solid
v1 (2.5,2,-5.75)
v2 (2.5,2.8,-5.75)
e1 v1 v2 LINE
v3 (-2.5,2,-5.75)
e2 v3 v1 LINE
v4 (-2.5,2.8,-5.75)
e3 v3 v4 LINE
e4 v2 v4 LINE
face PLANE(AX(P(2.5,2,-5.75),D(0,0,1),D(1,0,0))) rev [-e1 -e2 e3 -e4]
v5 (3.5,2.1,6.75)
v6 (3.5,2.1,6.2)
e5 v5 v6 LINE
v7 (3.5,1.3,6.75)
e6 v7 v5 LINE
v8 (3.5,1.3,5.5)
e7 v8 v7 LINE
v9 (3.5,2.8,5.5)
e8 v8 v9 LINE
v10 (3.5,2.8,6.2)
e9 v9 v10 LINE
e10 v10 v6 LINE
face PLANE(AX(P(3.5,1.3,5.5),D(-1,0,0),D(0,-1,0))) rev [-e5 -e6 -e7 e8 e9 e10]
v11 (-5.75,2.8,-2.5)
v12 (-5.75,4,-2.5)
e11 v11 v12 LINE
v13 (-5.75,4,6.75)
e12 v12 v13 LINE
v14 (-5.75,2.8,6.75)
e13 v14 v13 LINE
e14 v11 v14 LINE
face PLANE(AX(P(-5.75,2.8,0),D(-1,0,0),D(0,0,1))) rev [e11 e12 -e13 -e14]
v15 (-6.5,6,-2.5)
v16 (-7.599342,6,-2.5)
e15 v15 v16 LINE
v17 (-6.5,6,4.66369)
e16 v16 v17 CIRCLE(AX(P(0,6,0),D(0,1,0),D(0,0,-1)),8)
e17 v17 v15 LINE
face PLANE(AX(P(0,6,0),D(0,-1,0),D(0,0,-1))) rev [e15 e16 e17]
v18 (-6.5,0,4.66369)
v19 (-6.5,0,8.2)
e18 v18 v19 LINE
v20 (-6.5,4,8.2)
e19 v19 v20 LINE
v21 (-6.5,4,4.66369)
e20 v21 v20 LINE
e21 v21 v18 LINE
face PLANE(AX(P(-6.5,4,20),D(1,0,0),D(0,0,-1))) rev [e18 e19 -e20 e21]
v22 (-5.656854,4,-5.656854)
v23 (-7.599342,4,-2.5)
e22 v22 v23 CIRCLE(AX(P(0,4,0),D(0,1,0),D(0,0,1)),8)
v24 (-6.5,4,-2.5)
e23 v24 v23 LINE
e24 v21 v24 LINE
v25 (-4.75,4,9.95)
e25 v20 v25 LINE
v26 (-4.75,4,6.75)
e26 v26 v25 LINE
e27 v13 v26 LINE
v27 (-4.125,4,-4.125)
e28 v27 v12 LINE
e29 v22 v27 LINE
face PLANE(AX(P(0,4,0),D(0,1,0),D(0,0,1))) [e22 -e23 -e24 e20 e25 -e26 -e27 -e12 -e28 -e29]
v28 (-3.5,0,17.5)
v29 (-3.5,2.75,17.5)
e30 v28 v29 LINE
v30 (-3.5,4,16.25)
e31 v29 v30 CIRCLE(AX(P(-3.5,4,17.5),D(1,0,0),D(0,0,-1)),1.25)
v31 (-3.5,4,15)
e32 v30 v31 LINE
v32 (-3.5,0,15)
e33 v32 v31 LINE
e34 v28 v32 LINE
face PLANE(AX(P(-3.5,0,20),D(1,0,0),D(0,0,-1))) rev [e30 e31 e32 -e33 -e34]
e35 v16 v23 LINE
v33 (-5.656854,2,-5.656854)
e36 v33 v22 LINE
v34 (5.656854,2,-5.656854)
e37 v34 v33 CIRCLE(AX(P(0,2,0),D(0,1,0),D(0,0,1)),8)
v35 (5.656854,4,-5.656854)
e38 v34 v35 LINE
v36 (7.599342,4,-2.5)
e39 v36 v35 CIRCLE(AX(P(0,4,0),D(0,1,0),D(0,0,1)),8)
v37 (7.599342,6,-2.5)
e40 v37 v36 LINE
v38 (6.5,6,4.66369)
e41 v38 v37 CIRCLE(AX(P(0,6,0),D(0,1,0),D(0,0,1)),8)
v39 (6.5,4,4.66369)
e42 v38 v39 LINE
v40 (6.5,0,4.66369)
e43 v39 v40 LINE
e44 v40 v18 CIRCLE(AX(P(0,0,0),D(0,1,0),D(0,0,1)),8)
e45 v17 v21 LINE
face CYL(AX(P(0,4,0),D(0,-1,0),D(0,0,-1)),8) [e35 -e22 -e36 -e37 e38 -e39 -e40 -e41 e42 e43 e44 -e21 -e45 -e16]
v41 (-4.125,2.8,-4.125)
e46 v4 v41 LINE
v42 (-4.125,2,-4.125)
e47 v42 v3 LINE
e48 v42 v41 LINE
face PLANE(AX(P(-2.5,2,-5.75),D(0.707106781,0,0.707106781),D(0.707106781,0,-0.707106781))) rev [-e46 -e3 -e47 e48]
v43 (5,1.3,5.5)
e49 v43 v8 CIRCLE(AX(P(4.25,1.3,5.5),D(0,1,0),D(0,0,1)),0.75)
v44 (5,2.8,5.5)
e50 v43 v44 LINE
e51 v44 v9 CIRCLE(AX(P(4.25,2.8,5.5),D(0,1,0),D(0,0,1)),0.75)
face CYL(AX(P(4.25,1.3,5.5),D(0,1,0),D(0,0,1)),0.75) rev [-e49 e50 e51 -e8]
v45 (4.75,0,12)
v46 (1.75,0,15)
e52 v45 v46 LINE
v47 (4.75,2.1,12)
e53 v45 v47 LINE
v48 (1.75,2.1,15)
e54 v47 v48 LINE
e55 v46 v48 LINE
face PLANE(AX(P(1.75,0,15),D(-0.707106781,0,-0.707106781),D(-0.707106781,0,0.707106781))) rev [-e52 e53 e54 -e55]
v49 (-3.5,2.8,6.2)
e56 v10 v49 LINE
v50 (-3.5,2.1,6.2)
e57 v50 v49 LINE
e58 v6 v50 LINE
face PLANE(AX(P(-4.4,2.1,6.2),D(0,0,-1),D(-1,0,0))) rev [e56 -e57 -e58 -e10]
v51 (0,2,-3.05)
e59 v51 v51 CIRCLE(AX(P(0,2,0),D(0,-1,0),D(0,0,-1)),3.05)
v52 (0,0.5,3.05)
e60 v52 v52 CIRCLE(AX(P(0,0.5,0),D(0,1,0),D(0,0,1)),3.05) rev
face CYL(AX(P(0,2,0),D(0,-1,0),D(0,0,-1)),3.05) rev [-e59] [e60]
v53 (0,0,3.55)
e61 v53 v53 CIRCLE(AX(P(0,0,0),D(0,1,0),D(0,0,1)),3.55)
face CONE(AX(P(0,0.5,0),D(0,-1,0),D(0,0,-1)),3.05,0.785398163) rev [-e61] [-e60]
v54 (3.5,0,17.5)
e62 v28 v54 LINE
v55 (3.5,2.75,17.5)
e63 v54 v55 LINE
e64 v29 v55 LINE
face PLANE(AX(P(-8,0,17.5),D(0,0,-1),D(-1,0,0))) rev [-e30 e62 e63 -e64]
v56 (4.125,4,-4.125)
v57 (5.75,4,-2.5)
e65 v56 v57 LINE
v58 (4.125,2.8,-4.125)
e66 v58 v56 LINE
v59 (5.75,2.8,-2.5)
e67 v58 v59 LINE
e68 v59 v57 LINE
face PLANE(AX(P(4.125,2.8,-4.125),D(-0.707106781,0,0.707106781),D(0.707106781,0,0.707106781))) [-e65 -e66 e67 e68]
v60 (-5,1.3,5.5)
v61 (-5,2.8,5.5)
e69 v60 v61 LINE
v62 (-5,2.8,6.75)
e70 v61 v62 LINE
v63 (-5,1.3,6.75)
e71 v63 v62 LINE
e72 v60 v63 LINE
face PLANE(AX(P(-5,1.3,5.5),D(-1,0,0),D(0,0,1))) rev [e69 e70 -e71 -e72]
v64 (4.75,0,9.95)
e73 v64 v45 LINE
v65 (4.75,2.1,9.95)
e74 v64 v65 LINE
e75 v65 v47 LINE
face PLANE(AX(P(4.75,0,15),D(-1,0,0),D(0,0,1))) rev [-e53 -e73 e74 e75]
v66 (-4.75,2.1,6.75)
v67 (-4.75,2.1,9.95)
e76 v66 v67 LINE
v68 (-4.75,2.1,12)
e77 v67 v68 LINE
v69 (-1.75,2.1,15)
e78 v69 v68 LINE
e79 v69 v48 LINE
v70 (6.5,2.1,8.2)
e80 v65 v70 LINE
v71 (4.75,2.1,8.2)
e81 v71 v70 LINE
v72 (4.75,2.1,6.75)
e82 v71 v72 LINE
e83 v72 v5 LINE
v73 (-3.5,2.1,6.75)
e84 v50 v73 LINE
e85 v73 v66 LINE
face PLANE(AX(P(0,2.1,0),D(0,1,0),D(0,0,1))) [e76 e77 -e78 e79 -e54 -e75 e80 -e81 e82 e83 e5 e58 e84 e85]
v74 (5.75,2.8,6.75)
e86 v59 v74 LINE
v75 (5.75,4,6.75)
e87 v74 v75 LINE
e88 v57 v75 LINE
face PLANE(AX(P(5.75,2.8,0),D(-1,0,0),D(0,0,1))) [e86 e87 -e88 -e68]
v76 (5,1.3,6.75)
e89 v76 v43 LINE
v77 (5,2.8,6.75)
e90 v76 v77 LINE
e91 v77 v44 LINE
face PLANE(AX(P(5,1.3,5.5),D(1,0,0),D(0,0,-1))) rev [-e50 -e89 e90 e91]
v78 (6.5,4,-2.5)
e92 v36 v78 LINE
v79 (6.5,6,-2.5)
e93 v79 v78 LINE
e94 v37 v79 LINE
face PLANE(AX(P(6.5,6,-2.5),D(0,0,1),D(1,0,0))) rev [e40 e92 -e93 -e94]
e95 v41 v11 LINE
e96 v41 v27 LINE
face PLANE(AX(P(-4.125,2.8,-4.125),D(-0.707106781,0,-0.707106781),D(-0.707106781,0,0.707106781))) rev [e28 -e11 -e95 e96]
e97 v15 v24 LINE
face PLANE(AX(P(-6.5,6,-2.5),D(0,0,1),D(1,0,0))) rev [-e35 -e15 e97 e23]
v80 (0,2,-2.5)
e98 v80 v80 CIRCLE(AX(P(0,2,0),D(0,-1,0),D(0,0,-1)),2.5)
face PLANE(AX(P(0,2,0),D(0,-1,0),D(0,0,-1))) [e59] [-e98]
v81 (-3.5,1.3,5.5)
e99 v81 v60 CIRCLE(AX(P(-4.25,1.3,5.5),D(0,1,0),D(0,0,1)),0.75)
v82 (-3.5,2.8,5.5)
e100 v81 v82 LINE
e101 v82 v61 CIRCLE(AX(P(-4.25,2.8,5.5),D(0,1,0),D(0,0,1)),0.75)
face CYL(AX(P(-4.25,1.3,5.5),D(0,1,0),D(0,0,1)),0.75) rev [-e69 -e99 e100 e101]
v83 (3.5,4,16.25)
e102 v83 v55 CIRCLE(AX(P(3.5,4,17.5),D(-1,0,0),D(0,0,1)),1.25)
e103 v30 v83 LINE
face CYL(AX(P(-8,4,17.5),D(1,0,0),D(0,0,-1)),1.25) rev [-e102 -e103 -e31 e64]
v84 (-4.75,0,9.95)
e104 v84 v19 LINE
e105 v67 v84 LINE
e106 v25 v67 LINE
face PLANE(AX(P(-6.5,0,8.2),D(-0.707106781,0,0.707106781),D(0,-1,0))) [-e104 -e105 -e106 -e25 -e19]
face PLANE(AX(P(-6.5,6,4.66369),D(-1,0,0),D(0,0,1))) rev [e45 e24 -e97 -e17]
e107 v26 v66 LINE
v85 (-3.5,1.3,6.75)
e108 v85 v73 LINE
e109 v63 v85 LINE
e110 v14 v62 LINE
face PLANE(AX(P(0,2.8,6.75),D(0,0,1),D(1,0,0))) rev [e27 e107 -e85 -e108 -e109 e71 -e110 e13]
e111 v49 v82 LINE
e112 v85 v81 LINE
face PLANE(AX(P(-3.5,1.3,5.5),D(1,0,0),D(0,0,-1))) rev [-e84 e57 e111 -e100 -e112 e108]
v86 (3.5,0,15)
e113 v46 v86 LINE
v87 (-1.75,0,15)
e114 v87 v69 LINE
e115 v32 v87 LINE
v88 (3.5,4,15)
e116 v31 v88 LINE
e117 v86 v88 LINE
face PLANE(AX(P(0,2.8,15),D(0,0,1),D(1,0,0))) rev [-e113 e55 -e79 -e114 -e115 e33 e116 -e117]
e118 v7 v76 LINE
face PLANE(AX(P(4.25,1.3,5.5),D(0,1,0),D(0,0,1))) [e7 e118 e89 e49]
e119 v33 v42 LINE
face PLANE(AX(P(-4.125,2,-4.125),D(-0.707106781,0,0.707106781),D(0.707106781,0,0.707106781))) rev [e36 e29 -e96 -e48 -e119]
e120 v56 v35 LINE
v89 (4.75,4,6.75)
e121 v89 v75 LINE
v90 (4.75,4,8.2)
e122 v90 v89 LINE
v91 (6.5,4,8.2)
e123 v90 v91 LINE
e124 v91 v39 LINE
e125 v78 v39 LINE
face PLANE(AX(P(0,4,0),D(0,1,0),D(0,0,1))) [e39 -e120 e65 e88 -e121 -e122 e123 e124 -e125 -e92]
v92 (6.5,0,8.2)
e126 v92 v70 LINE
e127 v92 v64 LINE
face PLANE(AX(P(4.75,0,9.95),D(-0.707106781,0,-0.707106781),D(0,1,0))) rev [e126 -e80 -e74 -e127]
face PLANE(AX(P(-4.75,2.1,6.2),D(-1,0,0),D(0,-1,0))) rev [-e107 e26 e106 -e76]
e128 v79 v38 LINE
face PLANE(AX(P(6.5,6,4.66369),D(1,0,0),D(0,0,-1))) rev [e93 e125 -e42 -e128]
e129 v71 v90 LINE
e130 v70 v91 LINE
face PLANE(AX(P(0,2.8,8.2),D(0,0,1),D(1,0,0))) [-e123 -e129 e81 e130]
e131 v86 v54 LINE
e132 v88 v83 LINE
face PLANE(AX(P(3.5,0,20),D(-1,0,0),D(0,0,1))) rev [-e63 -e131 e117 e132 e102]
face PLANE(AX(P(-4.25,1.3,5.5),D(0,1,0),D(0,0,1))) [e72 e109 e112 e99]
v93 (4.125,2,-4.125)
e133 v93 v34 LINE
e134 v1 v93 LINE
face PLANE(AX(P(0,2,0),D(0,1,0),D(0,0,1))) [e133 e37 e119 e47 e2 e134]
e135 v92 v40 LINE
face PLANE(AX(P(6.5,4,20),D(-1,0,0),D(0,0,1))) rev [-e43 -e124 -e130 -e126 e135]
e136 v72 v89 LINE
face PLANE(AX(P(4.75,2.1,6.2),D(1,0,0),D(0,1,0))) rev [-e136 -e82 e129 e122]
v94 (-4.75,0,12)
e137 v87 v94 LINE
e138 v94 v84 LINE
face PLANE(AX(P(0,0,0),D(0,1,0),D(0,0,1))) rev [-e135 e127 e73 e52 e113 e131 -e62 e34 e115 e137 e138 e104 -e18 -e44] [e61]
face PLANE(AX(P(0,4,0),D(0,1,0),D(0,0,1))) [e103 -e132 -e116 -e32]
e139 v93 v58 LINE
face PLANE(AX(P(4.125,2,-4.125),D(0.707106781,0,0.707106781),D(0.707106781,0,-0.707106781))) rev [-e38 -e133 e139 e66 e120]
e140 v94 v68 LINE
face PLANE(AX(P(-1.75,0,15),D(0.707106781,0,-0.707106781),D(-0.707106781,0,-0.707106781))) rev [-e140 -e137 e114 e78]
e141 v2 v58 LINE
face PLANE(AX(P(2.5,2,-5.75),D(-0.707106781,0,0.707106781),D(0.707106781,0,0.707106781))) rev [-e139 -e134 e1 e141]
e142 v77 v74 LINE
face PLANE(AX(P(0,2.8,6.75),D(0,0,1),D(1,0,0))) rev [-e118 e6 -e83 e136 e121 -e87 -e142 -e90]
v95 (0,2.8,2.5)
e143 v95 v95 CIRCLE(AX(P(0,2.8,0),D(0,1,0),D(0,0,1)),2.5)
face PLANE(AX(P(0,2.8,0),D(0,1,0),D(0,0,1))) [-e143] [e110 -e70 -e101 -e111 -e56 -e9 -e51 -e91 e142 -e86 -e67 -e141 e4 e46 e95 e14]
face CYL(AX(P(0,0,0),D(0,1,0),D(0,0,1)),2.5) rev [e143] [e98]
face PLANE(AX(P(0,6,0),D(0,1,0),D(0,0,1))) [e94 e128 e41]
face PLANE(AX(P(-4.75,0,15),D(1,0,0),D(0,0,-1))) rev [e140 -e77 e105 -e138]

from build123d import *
from build123d.topology import SkipClean

# Parameters (mm, degrees)
BOSS_EXTRUDE1_DEPTH      = 4
SKETCH2_R                = 3.05
CUT_EXTRUDE1_DEPTH       = 2
SKETCH3_R                = 1.5
CUT_EXTRUDE2_DEPTH       = 22.633307653
CUT_EXTRUDE4_START       = -1.2
CUT_EXTRUDE4_DEPTH       = 1.2
CUT_EXTRUDE6_DEPTH       = 1.5
CUT_EXTRUDE7_DEPTH       = 0.7
BOSS_EXTRUDE3_DEPTH      = 2
CUT_EXTRUDE12_START      = -2
CUT_EXTRUDE12_DEPTH      = 2
SKETCH6_R                = 2.5
CUT_EXTRUDE13_DEPTH      = 22.777052142
SKETCH17_W               = 0.35
SKETCH17_H               = 1.45
CUT_EXTRUDE14_DEPTH      = 1.9
BOSS_EXTRUDE5_DEPTH      = 1.9
CUT_EXTRUDE15_DEPTH      = 22.9089023
CUT_EXTRUDE15_DEPTH_BACK = 22.9089023
CUT_EXTRUDE16_DEPTH      = 22.890865675
CUT_EXTRUDE16_DEPTH_BACK = 22.890865675
CUT_EXTRUDE17_DEPTH      = 24.837994882
CUT_EXTRUDE17_DEPTH_BACK = 24.837994882
CHAMFER1_SIZE            = 1.75
CUT_EXTRUDE18_DEPTH      = 24.837994882
BOSS_EXTRUDE6_DEPTH      = 1.9
CHAMFER2_SIZE            = 0.5


with BuildPart() as part:
    # Sketch1 → Boss-Extrude1 (new body)
    with BuildSketch(Plane(origin=(0, 0, 0), x_dir=(1, 0, 0), z_dir=(0, 1, 0))):
        with BuildLine():
            Line((6.5, -20), (6.5, -4.663689527))
            ThreePointArc((6.5, -4.663689527), (7.615773106, -2.449489743), (8, 0))
            ThreePointArc((8, 0), (7.615773106, 2.449489743), (6.5, 4.663689527))
            ThreePointArc((6.5, 4.663689527), (0, 8), (-6.5, 4.663689527))
            ThreePointArc((-6.5, 4.663689527), (-7.615773106, 2.449489743), (-8, 0))
            ThreePointArc((-8, 0), (-7.615773106, -2.449489743), (-6.5, -4.663689527))
            Line((-6.5, -4.663689527), (-6.5, -20))
            Line((-6.5, -20), (6.5, -20))
        make_face()
    extrude(amount=BOSS_EXTRUDE1_DEPTH)

    # Sketch2 → Cut-Extrude1 (cut)
    with BuildSketch(Plane.XZ):
        with Locations(Location((0, 0, 0), (0, 0, 270))):
            Circle(SKETCH2_R)
    extrude(amount=-CUT_EXTRUDE1_DEPTH, mode=Mode.SUBTRACT)

    # Sketch3 → Cut-Extrude2 (cut, through all)
    with BuildSketch(Plane.XZ.offset(-2)):
        with Locations(Location((0, 0, 0), (0, 0, 270))):
            Circle(SKETCH3_R)
    extrude(amount=-CUT_EXTRUDE2_DEPTH, mode=Mode.SUBTRACT)

    # Sketch5 → Cut-Extrude4 (cut)
    with BuildSketch(Plane(origin=(0, 4, 0), x_dir=(1, 0, 0), z_dir=(0, 1, 0)).offset(CUT_EXTRUDE4_START)):
        with BuildLine():
            Line((5.75, 2.5), (2.5, 5.75))
            Line((2.5, 5.75), (0.75, 5.75))
            Line((0.75, 5.75), (0.75, 7.964766161))
            ThreePointArc((0.75, 7.964766161), (0, 8), (-0.75, 7.964766161))
            Line((-0.75, 7.964766161), (-0.75, 5.75))
            Line((-0.75, 5.75), (-2.5, 5.75))
            Line((-2.5, 5.75), (-5.75, 2.5))
            Line((-5.75, 2.5), (-5.75, -6.75))
            Line((-5.75, -6.75), (-4.4, -6.75))
            Line((-4.4, -6.75), (-4.4, -8.2))
            Line((-4.4, -8.2), (-5.66, -10))
            Line((-5.66, -10), (-6.5, -10))
            Line((-6.5, -10), (-6.5, -11.2))
            Line((-6.5, -11.2), (-6.5, -15))
            Line((-6.5, -15), (6.5, -15))
            Line((6.5, -15), (6.5, -11.2))
            Line((6.5, -11.2), (6.5, -10))
            Line((6.5, -10), (6.5, -8.2))
            Line((6.5, -8.2), (4.4, -8.2))
            Line((4.4, -8.2), (4.4, -6.75))
            Line((4.4, -6.75), (5.75, -6.75))
            Line((5.75, -6.75), (5.75, 2.5))
        make_face()
    extrude(amount=CUT_EXTRUDE4_DEPTH, mode=Mode.SUBTRACT)

    # Sketch7 → Cut-Extrude6 (cut)
    with BuildSketch(Plane(origin=(0, 2.8, 0), x_dir=(1, 0, 0), z_dir=(0, 1, 0))):
        with BuildLine():
            Line((-4.999999999, -5.5), (-4.999999999, -6.75))
            Line((-4.999999999, -6.75), (-3.499999999, -6.75))
            Line((-3.499999999, -6.75), (-3.499999999, -5.5))
            ThreePointArc((-3.499999999, -5.5), (-4.249999999, -4.75), (-4.999999999, -5.5))
        make_face()
        with BuildLine():
            Line((3.500000001, -5.5), (3.500000001, -6.75))
            Line((3.500000001, -6.75), (5.000000001, -6.75))
            Line((5.000000001, -6.75), (5.000000001, -5.5))
            ThreePointArc((5.000000001, -5.5), (4.250000001, -4.75), (3.500000001, -5.5))
        make_face()
    extrude(amount=-CUT_EXTRUDE6_DEPTH, mode=Mode.SUBTRACT)

    # Sketch9 → Cut-Extrude7 (cut)
    with BuildSketch(Plane(origin=(0, 2.8, 0), x_dir=(1, 0, 0), z_dir=(0, 1, 0))):
        Polygon((-6.5, -15), (6.5, -15), (6.5, -11.2), (6.5, -10), (6.5, -8.2), (4.75, -8.2), (4.75, -6.2), (4.4, -6.2), (-4.4, -6.2), (-4.75, -6.2), (-4.75, -8.7), (-5.66, -10), (-6.5, -10), (-6.5, -11.2), align=None)
    extrude(amount=-CUT_EXTRUDE7_DEPTH, mode=Mode.SUBTRACT)

    # Sketch14 → Boss-Extrude3 (add)
    with SkipClean():  # the faces are left unmerged after this step: merging them gives an invalid solid
        with BuildSketch(Plane(origin=(0, 4, 0), x_dir=(1, 0, 0), z_dir=(0, 1, 0))):
            with BuildLine():
                Line((6.5, -4.663689527), (6.5, 2.5))
                Line((6.5, 2.5), (7.599342077, 2.5))
                ThreePointArc((7.599342077, 2.5), (7.907431546, -1.213476964), (6.5, -4.663689527))
            make_face()
            with BuildLine():
                Line((-6.5, -4.663689527), (-6.5, 2.5))
                Line((-6.5, 2.5), (-7.599342077, 2.5))
                ThreePointArc((-7.599342077, 2.5), (-7.907431546, -1.213476964), (-6.5, -4.663689527))
            make_face()
        extrude(amount=BOSS_EXTRUDE3_DEPTH)

    # Sketch15 → Cut-Extrude12 (cut)
    with SkipClean():  # the faces are left unmerged after this step: merging them gives an invalid solid
        with BuildSketch(Plane(origin=(0, 4, 0), x_dir=(1, 0, 0), z_dir=(0, 1, 0)).offset(CUT_EXTRUDE12_START)):
            with BuildLine():
                Line((2.5, 5.75), (-2.5, 5.75))
                Line((-2.5, 5.75), (-4.125, 4.125))
                Line((-4.125, 4.125), (-5.656854249, 5.656854249))
                ThreePointArc((-5.656854249, 5.656854249), (0, 8), (5.656854249, 5.656854249))
                Line((5.656854249, 5.656854249), (4.125, 4.125))
                Line((4.125, 4.125), (2.5, 5.75))
            make_face()
        extrude(amount=CUT_EXTRUDE12_DEPTH, mode=Mode.SUBTRACT)

    # Sketch6 → Cut-Extrude13 (cut, through all)
    with SkipClean():  # the faces are left unmerged after this step: merging them gives an invalid solid
        with BuildSketch(Plane(origin=(0, 2.8, 0), x_dir=(1, 0, 0), z_dir=(0, 1, 0))):
            with Locations(Location((0, 0, 0), (0, 0, 270))):
                Circle(SKETCH6_R)
        extrude(amount=-CUT_EXTRUDE13_DEPTH, mode=Mode.SUBTRACT)

    # Sketch17 → Cut-Extrude14 (cut)
    with SkipClean():  # the faces are left unmerged after this step: merging them gives an invalid solid
        with BuildSketch(Plane(origin=(0, 4, 0), x_dir=(1, 0, 0), z_dir=(0, 1, 0))):
            Polygon((-4.75, -6.75), (-4.4, -6.75), (-4.4, -8.2), (-4.75, -8.7), align=None)
            with Locations((4.575, -7.475)):
                Rectangle(SKETCH17_W, SKETCH17_H)
        extrude(amount=-CUT_EXTRUDE14_DEPTH, mode=Mode.SUBTRACT)

    # Sketch18 → Boss-Extrude5 (add)
    with SkipClean():  # the faces are left unmerged after this step: merging them gives an invalid solid
        with BuildSketch(Plane(origin=(0, 2.1, 0), x_dir=(1, 0, 0), z_dir=(0, 1, 0))):
            Polygon((-6.5, -10), (-6.5, -15), (-4.75, -15), (-4.75, -8.7), (-5.66, -10), align=None)
        extrude(amount=BOSS_EXTRUDE5_DEPTH)

    # Sketch19 → Cut-Extrude15 (cut, two sides: drawn at the far end of the back side and taken through both)
    with SkipClean():  # the faces are left unmerged after this step: merging them gives an invalid solid
        with BuildSketch(Plane(origin=(0, 4, 0), x_dir=(1, 0, 0), z_dir=(0, 1, 0)).offset(-CUT_EXTRUDE15_DEPTH_BACK)):
            Polygon((-6.5, -20), (-3.5, -20), (-3.5, -15), (-4.75, -15), (-4.75, -8.2), (-6.5, -8.2), align=None)
            Polygon((4.75, -8.2), (6.5, -8.2), (6.5, -20), (3.5, -20), (3.5, -15), (4.75, -15), align=None)
        extrude(amount=CUT_EXTRUDE15_DEPTH + CUT_EXTRUDE15_DEPTH_BACK, mode=Mode.SUBTRACT)

    # Sketch20 → Cut-Extrude16 (cut, two sides: drawn at the far end of the back side and taken through both)
    with SkipClean():  # the faces are left unmerged after this step: merging them gives an invalid solid
        with BuildSketch(Plane(origin=(0, 2.1, 0), x_dir=(1, 0, 0), z_dir=(0, 1, 0)).offset(-CUT_EXTRUDE16_DEPTH_BACK)):
            Polygon((4.75, -15), (1.75, -15), (4.75, -12), align=None)
            Polygon((-4.75, -15), (-1.75, -15), (-4.75, -12), align=None)
        extrude(amount=CUT_EXTRUDE16_DEPTH + CUT_EXTRUDE16_DEPTH_BACK, mode=Mode.SUBTRACT)

    # Sketch21 → Cut-Extrude17 (cut, two sides: drawn at the far end of the back side and taken through both)
    with SkipClean():  # the faces are left unmerged after this step: merging them gives an invalid solid
        with BuildSketch(Plane(origin=(3.5, 0, 0), x_dir=(0, 0, -1), z_dir=(1, 0, 0)).offset(-CUT_EXTRUDE17_DEPTH_BACK)):
            with BuildLine():
                Line((-18.75, 4), (-16.25, 4))
                ThreePointArc((-16.25, 4), (-17.5, 2.75), (-18.75, 4))
            make_face()
        extrude(amount=CUT_EXTRUDE17_DEPTH + CUT_EXTRUDE17_DEPTH_BACK, mode=Mode.SUBTRACT)

    # Chamfer1
    # the kernel refuses this chamfer: 1.75 mm, written as the material it adds along each edge
    with BuildSketch(Plane(origin=(4.75, 0, 8.2), x_dir=(0.9996219169112968, 0, -0.027495876610586112), z_dir=(0, 1, 0))) as chamfer1_piece_1:
        Polygon((CHAMFER1_SIZE * 0.999621916911, -CHAMFER1_SIZE * 0.0274958766106), (-CHAMFER1_SIZE * 0.0274958766106, -CHAMFER1_SIZE * 0.999621916911), (0, 0), align=None)
    extrude(amount=2.1)
    with BuildSketch(Plane(origin=(-4.75, 2.1, 8.2), x_dir=(0.02749587661058662, 0, 0.9996219169112968), z_dir=(0, -1, 0))) as chamfer1_piece_2:
        Polygon((CHAMFER1_SIZE * 0.999621916911, CHAMFER1_SIZE * 0.0274958766106), (-CHAMFER1_SIZE * 0.0274958766106, CHAMFER1_SIZE * 0.999621916911), (0, 0), align=None)
    extrude(amount=2.1)

    # Sketch22 → Cut-Extrude18 (cut, through all)
    with BuildSketch(Plane(origin=(3.5, 0, 0), x_dir=(0, 0, -1), z_dir=(1, 0, 0))):
        with BuildLine():
            Line((-20, 0), (-17.5, 0))
            Line((-17.5, 0), (-17.5, 2.75))
            ThreePointArc((-17.5, 2.75), (-18.383883476, 3.116116524), (-18.75, 4))
            Line((-18.75, 4), (-20, 4))
            Line((-20, 4), (-20, 2.75))
            Line((-20, 2.75), (-20, 0))
        make_face()
    extrude(amount=-CUT_EXTRUDE18_DEPTH, mode=Mode.SUBTRACT)

    # Sketch24 → Boss-Extrude6 (add)
    with BuildSketch(Plane(origin=(0, 2.1, 0), x_dir=(1, 0, 0), z_dir=(0, 1, 0))):
        Polygon((-6.5, -8.2), (-4.75, -8.2), (-4.75, -9.95), align=None)
    extrude(amount=BOSS_EXTRUDE6_DEPTH)

    # Chamfer2
    chamfer2_edges = [part.edges().sort_by_distance(p)[0] for p in [
        (0, 0, 3.05),
    ]]
    chamfer(chamfer2_edges, length=CHAMFER2_SIZE)


solid = part.part
